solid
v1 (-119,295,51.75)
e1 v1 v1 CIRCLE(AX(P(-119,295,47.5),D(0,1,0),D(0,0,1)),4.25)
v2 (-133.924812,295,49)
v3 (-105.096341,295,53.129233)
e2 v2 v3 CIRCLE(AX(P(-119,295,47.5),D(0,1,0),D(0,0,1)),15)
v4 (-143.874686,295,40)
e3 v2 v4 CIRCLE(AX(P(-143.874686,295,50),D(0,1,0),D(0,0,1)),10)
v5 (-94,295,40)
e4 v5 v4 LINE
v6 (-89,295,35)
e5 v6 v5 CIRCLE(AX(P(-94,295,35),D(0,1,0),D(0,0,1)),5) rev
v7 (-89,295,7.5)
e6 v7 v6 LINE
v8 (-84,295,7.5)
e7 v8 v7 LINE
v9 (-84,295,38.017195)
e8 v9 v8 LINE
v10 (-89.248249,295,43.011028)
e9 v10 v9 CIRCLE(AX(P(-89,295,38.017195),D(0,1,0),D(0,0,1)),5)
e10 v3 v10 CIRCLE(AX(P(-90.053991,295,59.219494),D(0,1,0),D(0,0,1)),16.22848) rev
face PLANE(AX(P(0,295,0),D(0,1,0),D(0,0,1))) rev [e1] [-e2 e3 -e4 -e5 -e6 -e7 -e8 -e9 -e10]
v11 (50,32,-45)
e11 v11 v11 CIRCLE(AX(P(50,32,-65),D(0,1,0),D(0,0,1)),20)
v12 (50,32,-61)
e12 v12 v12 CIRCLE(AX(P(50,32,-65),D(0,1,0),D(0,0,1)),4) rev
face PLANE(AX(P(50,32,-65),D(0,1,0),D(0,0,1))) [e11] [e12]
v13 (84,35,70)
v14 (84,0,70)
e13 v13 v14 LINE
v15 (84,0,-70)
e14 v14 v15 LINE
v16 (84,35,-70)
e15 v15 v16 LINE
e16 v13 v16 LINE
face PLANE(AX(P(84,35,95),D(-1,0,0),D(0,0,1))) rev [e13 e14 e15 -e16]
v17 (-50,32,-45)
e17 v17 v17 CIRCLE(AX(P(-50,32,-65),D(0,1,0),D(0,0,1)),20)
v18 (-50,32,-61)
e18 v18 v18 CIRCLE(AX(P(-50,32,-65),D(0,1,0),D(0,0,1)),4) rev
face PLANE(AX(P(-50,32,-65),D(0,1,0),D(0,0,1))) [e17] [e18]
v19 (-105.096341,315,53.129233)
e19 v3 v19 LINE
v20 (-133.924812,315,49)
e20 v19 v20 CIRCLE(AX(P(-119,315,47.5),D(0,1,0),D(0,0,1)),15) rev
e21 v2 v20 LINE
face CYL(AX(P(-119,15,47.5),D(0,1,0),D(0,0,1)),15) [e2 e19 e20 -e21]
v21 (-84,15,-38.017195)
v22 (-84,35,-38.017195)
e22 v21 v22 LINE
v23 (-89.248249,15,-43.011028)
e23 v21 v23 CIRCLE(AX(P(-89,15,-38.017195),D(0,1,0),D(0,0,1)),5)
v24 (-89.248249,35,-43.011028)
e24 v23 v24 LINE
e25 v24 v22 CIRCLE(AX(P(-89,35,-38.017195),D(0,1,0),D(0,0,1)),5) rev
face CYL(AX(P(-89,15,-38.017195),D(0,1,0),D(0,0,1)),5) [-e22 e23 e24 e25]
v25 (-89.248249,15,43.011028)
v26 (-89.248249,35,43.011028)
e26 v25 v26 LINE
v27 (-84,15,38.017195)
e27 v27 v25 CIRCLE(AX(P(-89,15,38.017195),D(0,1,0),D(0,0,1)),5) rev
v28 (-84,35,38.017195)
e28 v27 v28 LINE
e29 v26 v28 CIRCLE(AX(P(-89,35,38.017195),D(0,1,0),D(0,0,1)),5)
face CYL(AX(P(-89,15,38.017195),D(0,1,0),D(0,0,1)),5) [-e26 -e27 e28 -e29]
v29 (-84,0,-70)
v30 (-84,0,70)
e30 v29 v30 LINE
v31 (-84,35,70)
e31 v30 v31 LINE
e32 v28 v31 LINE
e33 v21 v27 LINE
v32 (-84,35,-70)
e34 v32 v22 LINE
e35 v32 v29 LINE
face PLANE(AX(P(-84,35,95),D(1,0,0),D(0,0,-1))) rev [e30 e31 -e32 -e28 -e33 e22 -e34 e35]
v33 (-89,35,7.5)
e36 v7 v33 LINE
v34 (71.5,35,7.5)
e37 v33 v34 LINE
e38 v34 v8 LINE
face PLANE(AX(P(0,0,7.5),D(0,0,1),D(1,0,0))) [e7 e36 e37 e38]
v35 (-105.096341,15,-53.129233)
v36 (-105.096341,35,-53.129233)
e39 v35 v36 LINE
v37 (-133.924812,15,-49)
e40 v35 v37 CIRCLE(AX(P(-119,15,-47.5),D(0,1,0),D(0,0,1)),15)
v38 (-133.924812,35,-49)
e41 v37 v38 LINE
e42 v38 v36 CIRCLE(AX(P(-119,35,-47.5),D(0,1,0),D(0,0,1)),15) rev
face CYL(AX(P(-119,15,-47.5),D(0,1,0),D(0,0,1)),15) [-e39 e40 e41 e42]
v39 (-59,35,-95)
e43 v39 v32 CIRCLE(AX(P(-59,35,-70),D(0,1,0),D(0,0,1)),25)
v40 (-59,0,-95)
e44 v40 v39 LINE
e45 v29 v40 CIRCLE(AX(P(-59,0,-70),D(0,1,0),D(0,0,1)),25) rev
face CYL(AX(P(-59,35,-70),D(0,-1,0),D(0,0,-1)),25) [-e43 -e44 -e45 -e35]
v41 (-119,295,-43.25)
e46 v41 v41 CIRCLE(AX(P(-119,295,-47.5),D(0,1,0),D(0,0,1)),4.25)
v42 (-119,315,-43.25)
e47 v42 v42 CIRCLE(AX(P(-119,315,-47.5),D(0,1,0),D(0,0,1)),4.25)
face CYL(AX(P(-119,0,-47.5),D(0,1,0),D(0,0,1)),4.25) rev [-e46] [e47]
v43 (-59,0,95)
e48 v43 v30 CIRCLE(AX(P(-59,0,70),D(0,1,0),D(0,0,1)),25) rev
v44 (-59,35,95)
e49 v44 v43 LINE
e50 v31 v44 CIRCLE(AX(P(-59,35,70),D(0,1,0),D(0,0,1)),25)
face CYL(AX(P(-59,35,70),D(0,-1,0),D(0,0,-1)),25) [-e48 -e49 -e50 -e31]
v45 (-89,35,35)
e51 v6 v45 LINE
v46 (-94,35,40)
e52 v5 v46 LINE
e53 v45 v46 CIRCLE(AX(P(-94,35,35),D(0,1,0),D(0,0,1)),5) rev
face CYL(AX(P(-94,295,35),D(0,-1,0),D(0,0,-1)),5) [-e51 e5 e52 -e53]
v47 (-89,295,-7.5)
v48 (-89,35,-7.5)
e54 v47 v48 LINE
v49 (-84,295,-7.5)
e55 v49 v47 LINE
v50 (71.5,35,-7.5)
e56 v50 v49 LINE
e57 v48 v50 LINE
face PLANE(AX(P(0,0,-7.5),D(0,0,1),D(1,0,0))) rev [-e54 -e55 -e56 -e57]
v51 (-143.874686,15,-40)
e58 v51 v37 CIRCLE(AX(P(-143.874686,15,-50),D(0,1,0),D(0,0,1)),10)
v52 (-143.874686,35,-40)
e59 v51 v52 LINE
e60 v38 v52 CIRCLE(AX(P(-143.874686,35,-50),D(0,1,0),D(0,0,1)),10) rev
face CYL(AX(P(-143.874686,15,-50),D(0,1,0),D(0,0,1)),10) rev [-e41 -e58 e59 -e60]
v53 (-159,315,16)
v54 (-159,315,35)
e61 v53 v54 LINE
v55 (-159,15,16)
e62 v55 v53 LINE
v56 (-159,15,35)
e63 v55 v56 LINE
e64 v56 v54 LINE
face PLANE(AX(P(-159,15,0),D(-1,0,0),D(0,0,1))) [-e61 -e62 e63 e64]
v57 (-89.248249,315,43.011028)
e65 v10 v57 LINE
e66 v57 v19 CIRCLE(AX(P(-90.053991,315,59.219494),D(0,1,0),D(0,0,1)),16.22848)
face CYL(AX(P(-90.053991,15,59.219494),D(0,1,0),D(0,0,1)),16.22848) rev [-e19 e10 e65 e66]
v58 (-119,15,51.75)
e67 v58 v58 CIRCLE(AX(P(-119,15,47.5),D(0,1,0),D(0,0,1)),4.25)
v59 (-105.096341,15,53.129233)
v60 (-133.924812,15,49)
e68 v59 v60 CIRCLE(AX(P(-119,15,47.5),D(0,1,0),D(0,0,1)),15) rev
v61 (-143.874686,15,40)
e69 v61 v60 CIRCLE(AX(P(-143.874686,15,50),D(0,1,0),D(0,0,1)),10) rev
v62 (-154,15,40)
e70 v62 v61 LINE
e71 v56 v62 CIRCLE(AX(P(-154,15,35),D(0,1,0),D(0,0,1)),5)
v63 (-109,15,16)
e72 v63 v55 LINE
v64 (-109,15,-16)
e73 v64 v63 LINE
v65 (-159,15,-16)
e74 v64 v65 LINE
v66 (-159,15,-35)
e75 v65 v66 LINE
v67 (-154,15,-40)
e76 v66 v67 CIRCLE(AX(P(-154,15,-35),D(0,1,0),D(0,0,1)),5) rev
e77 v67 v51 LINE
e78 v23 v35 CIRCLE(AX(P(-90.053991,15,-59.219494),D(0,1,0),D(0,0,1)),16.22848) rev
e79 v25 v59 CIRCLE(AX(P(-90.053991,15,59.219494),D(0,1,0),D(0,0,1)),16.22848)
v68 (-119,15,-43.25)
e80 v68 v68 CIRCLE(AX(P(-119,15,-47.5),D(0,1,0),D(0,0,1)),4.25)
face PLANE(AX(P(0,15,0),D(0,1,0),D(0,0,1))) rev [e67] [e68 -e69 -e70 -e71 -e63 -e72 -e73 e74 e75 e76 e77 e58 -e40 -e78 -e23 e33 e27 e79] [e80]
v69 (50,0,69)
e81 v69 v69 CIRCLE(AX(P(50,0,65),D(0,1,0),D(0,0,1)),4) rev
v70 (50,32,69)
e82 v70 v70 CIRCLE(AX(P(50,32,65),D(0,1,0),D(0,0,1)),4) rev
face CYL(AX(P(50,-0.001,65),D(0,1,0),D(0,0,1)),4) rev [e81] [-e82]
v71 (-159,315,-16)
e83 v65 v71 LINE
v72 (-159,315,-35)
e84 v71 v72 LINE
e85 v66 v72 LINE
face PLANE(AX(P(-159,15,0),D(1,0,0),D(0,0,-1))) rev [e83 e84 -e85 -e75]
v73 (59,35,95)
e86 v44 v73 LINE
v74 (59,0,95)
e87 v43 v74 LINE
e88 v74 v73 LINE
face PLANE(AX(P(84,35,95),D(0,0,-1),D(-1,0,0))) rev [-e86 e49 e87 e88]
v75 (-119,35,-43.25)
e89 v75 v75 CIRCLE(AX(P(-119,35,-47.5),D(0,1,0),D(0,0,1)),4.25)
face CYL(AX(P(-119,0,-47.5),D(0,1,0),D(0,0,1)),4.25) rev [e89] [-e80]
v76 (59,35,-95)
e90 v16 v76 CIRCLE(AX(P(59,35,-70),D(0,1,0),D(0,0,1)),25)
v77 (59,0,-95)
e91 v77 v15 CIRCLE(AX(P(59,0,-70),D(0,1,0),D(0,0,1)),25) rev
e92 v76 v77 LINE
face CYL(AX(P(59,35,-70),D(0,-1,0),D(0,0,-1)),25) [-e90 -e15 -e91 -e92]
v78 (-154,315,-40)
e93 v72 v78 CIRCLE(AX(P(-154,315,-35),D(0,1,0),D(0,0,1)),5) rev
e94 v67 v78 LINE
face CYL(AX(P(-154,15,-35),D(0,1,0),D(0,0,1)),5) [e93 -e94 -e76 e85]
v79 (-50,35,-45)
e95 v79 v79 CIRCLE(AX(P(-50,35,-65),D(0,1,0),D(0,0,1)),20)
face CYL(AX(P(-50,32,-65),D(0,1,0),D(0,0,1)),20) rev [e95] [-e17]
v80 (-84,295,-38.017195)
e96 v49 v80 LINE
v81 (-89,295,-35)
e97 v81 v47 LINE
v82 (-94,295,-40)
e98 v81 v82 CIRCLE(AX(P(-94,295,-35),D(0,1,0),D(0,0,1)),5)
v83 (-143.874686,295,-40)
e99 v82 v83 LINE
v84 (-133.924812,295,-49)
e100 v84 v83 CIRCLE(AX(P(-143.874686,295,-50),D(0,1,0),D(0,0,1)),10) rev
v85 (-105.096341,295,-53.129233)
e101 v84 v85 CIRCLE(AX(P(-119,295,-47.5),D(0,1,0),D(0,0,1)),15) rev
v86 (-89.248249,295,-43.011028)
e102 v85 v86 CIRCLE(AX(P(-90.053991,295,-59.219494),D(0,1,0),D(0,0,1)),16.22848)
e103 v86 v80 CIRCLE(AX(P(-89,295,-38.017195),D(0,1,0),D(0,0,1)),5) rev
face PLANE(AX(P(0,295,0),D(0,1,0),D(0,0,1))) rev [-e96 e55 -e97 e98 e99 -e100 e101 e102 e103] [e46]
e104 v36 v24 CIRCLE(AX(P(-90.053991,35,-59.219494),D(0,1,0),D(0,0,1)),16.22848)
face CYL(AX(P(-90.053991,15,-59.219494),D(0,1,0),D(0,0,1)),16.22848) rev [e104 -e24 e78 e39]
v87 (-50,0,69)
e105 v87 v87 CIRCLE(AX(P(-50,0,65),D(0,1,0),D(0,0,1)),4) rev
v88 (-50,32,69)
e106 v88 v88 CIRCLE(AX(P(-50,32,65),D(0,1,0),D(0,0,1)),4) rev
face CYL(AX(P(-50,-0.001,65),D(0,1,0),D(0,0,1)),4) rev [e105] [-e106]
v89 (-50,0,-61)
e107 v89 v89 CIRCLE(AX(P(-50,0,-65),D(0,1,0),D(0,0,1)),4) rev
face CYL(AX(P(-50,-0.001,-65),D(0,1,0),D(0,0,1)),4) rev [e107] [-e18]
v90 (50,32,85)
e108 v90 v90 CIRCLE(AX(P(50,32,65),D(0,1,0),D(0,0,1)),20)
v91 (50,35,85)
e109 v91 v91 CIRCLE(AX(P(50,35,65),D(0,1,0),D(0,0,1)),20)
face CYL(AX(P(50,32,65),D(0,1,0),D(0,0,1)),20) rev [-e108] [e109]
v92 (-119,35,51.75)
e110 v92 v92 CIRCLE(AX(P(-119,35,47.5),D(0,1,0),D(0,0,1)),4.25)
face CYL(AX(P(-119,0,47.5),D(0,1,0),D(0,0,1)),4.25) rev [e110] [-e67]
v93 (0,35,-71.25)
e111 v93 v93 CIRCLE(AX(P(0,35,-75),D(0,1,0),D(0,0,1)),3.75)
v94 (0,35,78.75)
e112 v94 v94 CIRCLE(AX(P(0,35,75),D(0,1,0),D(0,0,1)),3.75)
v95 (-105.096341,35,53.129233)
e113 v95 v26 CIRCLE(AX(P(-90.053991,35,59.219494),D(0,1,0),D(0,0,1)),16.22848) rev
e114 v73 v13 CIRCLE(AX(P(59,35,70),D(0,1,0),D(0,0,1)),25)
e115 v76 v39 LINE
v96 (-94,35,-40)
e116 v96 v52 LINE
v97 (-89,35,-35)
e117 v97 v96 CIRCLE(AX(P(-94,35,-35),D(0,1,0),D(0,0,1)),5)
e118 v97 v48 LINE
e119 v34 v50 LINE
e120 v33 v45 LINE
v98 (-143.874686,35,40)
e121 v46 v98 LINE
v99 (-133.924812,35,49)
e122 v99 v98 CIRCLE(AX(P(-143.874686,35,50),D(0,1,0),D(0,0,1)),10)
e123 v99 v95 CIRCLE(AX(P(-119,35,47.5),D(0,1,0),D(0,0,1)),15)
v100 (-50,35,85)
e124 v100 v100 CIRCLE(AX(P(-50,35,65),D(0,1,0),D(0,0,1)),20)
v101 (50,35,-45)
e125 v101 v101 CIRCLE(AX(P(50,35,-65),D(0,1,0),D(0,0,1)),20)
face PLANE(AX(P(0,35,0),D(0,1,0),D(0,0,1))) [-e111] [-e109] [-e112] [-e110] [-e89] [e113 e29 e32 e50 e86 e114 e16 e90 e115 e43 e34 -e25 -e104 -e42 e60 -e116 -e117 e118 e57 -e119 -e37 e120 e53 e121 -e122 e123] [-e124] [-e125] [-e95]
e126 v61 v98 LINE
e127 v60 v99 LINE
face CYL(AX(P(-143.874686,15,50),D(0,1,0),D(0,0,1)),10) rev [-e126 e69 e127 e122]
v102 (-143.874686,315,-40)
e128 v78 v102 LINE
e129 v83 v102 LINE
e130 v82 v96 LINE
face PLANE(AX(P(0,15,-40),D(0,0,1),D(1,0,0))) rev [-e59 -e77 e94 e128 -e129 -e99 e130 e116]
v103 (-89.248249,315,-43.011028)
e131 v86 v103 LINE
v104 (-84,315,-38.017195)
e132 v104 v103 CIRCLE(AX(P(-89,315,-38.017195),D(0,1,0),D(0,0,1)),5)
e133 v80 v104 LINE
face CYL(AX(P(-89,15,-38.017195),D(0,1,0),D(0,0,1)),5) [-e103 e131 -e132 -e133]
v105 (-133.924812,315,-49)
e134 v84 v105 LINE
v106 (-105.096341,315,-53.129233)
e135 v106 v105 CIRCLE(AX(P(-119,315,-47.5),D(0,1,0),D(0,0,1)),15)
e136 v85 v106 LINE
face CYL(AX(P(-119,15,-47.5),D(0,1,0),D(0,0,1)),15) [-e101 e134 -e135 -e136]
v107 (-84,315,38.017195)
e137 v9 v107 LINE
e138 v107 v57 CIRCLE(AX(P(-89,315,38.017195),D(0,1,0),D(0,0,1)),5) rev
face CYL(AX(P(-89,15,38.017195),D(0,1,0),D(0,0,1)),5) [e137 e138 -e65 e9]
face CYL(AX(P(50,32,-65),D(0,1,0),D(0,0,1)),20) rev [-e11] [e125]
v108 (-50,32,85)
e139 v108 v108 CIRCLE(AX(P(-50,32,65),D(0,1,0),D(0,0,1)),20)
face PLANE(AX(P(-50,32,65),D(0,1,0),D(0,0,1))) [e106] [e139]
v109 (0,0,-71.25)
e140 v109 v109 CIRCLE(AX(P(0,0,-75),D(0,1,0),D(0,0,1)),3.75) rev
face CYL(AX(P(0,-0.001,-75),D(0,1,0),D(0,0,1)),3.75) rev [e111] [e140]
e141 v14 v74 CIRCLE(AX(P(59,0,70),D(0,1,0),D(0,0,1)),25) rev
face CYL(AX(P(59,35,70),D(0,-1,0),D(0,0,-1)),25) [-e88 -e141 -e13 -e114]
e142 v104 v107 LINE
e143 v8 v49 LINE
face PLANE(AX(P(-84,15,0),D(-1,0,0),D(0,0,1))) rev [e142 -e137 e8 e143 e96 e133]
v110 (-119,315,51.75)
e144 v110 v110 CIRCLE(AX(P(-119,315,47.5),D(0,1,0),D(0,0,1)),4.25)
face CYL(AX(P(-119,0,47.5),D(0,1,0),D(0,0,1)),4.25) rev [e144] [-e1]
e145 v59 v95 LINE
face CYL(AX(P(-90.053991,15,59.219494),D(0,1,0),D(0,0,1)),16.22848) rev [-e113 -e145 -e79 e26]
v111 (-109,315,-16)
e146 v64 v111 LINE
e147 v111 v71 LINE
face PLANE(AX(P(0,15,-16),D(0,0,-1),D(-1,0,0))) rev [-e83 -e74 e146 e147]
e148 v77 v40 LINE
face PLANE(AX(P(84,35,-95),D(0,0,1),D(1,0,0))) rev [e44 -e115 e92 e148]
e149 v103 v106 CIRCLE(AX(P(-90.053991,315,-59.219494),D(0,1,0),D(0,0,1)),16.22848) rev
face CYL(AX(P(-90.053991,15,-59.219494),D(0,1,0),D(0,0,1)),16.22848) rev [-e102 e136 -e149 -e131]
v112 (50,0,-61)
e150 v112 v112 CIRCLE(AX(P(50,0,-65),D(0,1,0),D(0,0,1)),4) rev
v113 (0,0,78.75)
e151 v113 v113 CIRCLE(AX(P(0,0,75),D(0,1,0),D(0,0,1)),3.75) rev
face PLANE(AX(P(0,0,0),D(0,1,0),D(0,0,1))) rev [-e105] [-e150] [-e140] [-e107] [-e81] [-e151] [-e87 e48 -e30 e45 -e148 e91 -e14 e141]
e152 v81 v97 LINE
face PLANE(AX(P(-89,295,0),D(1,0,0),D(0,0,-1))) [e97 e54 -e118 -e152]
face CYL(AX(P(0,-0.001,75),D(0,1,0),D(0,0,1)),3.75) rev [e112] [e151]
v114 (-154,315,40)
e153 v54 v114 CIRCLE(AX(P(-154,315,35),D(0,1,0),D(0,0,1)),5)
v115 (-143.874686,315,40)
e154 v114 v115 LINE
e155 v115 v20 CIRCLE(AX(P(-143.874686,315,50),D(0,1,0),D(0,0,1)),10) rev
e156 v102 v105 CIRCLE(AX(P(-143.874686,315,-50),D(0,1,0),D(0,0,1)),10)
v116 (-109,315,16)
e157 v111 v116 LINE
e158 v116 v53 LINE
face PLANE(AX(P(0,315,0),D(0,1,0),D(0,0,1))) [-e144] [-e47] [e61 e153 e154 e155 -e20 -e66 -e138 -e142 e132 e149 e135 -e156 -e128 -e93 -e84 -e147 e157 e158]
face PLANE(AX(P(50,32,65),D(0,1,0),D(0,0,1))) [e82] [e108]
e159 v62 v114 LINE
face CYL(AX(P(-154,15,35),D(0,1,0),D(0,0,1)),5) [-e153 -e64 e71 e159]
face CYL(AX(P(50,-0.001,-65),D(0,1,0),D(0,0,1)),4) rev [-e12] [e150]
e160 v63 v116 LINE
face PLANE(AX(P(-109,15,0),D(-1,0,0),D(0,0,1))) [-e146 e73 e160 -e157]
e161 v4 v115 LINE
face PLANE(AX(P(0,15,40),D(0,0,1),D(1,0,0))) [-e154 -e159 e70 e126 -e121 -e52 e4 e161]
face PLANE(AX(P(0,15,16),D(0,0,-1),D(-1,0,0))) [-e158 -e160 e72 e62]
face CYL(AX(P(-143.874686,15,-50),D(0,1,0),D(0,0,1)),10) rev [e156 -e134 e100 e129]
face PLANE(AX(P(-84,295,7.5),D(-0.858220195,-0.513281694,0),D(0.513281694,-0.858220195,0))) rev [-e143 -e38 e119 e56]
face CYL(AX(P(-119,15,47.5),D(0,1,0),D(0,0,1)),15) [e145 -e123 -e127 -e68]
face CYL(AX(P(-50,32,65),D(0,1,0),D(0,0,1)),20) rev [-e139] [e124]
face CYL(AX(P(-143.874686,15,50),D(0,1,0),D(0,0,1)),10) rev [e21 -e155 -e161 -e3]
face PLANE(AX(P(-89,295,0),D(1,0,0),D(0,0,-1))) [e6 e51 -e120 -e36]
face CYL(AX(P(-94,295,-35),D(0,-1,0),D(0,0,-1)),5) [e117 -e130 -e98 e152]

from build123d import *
from build123d.topology import SkipClean

# Parameters (mm, degrees)
SKETCH_2_W          = 168
SKETCH_2_H          = 190
EXTRUDE_1_DEPTH     = 35
CUT_EXTRUDE_1_REACH = 133.552
SKETCH_3_R          = 3.75
CUT_EXTRUDE_2_REACH = 133.552
SKETCH_4_R          = 4
SKETCH_5_R          = 20
CUT_EXTRUDE_3_DEPTH = 3
FILLET_1_R          = 25
EXTRUDE_2_DEPTH     = 300
CUT_EXTRUDE_START   = 260
CUT_EXTRUDE_4_DEPTH = 260
EXTRUDE_3_DEPTH     = 7.5
SKETCH_12_R         = 4.25
CUT_EXTRUDE_5_DEPTH = 366.418937659


with BuildPart() as part:
    # 草图2 → 凸台-拉伸1 (new body)
    with BuildSketch(Plane(origin=(0, 0, 0), x_dir=(1, 0, 0), z_dir=(0, 1, 0))):
        Rectangle(SKETCH_2_W, SKETCH_2_H)
    extrude(amount=EXTRUDE_1_DEPTH)

    # 草图3 → 切除-拉伸1 (cut, up to next)
    with BuildSketch(Plane(origin=(0, 35, 0), x_dir=(1, 0, 0), z_dir=(0, 1, 0)), mode=Mode.PRIVATE) as cut_extrude_1_sk1:
        with Locations((0, 75)):
            Circle(SKETCH_3_R)
    cut_extrude_1_tool1 = extrude(cut_extrude_1_sk1.sketch, amount=-CUT_EXTRUDE_1_REACH, mode=Mode.PRIVATE) & part.part
    # 草图3 → 切除-拉伸1 (cut, up to next)
    with BuildSketch(Plane(origin=(0, 35, 0), x_dir=(1, 0, 0), z_dir=(0, 1, 0)), mode=Mode.PRIVATE) as cut_extrude_1_sk2:
        with Locations((0, -75)):
            Circle(SKETCH_3_R)
    cut_extrude_1_tool2 = extrude(cut_extrude_1_sk2.sketch, amount=-CUT_EXTRUDE_1_REACH, mode=Mode.PRIVATE) & part.part
    add(cut_extrude_1_tool1.solids().sort_by_distance((0, 35, -75))[0], mode=Mode.SUBTRACT)
    add(cut_extrude_1_tool2.solids().sort_by_distance((0, 35, 75))[0], mode=Mode.SUBTRACT)

    # 草图4 → 切除-拉伸2 (cut, up to next)
    with BuildSketch(Plane(origin=(0, 35, 0), x_dir=(1, 0, 0), z_dir=(0, 1, 0)), mode=Mode.PRIVATE) as cut_extrude_2_sk1:
        with Locations((-50, 65)):
            Circle(SKETCH_4_R)
    cut_extrude_2_tool1 = extrude(cut_extrude_2_sk1.sketch, amount=-CUT_EXTRUDE_2_REACH, mode=Mode.PRIVATE) & part.part
    # 草图4 → 切除-拉伸2 (cut, up to next)
    with BuildSketch(Plane(origin=(0, 35, 0), x_dir=(1, 0, 0), z_dir=(0, 1, 0)), mode=Mode.PRIVATE) as cut_extrude_2_sk2:
        with Locations((50, 65)):
            Circle(SKETCH_4_R)
    cut_extrude_2_tool2 = extrude(cut_extrude_2_sk2.sketch, amount=-CUT_EXTRUDE_2_REACH, mode=Mode.PRIVATE) & part.part
    # 草图4 → 切除-拉伸2 (cut, up to next)
    with BuildSketch(Plane(origin=(0, 35, 0), x_dir=(1, 0, 0), z_dir=(0, 1, 0)), mode=Mode.PRIVATE) as cut_extrude_2_sk3:
        with Locations((-50, -65)):
            Circle(SKETCH_4_R)
    cut_extrude_2_tool3 = extrude(cut_extrude_2_sk3.sketch, amount=-CUT_EXTRUDE_2_REACH, mode=Mode.PRIVATE) & part.part
    # 草图4 → 切除-拉伸2 (cut, up to next)
    with BuildSketch(Plane(origin=(0, 35, 0), x_dir=(1, 0, 0), z_dir=(0, 1, 0)), mode=Mode.PRIVATE) as cut_extrude_2_sk4:
        with Locations((50, -65)):
            Circle(SKETCH_4_R)
    cut_extrude_2_tool4 = extrude(cut_extrude_2_sk4.sketch, amount=-CUT_EXTRUDE_2_REACH, mode=Mode.PRIVATE) & part.part
    add(cut_extrude_2_tool1.solids().sort_by_distance((-50, 35, -65))[0], mode=Mode.SUBTRACT)
    add(cut_extrude_2_tool2.solids().sort_by_distance((50, 35, -65))[0], mode=Mode.SUBTRACT)
    add(cut_extrude_2_tool3.solids().sort_by_distance((-50, 35, 65))[0], mode=Mode.SUBTRACT)
    add(cut_extrude_2_tool4.solids().sort_by_distance((50, 35, 65))[0], mode=Mode.SUBTRACT)

    # 草图5 → 切除-拉伸3 (cut)
    with BuildSketch(Plane(origin=(0, 35, 0), x_dir=(1, 0, 0), z_dir=(0, 1, 0))):
        with Locations((-50, 65)):
            Circle(SKETCH_5_R)
        with Locations((50, 65)):
            Circle(SKETCH_5_R)
        with Locations((50, -65)):
            Circle(SKETCH_5_R)
        with Locations((-50, -65)):
            Circle(SKETCH_5_R)
    extrude(amount=-CUT_EXTRUDE_3_DEPTH, mode=Mode.SUBTRACT)

    # 圆角1
    fillet_1_edges = [part.edges().sort_by_distance(p)[0] for p in [
        (-84, 17.5, -95),
        (84, 17.5, -95),
        (84, 17.5, 95),
        (-84, 17.5, 95),
    ]]
    fillet(fillet_1_edges, radius=FILLET_1_R)

    # 草图8 → 凸台-拉伸2 (add)
    with BuildSketch(Plane(origin=(0, 315, 0), x_dir=(1, 0, 0), z_dir=(0, 1, 0))):
        with BuildLine():
            Line((-109, 16), (-109, -16))
            Line((-109, -16), (-159, -16))
            Line((-159, -16), (-159, -35))
            ThreePointArc((-159, -35), (-157.535533906, -38.535533906), (-154, -40))
            Line((-154, -40), (-143.874685928, -40))
            ThreePointArc((-143.874685928, -40), (-137.166481995, -42.583801513), (-133.924811557, -49))
            ThreePointArc((-133.924811557, -49), (-121.126812284, -62.348456806), (-105.096341116, -53.129233486))
            ThreePointArc((-105.096341116, -53.129233486), (-98.786961451, -45.541087589), (-89.248249261, -43.01102837))
            ThreePointArc((-89.248249261, -43.01102837), (-85.553352811, -41.639435016), (-84, -38.017194942))
            Line((-84, -38.017194942), (-84, 38.017194942))
            ThreePointArc((-84, 38.017194942), (-85.553352811, 41.639435016), (-89.248249261, 43.01102837))
            ThreePointArc((-89.248249261, 43.01102837), (-98.786961451, 45.541087589), (-105.096341116, 53.129233486))
            ThreePointArc((-105.096341116, 53.129233486), (-121.126812284, 62.348456806), (-133.924811557, 49))
            ThreePointArc((-133.924811557, 49), (-137.166481995, 42.583801513), (-143.874685928, 40))
            Line((-143.874685928, 40), (-154, 40))
            ThreePointArc((-154, 40), (-157.535533906, 38.535533906), (-159, 35))
            Line((-159, 35), (-159, 16))
            Line((-159, 16), (-109, 16))
        make_face()
    extrude(amount=-EXTRUDE_2_DEPTH)

    # 草图10 → 切除-拉伸4 (cut)
    with SkipClean():  # the faces are left unmerged after this step: merging them gives an invalid solid
        with BuildSketch(Plane(origin=(0, 35, 0), x_dir=(1, 0, 0), z_dir=(0, 1, 0)).offset(CUT_EXTRUDE_START)):
            with BuildLine():
                ThreePointArc((-94, 40), (-90.464466094, 38.535533906), (-89, 35))
                Line((-89, 35), (-89, -35))
                ThreePointArc((-89, -35), (-90.464466094, -38.535533906), (-94, -40))
                Line((-94, -40), (-154, -40))
                ThreePointArc((-154, -40), (-157.535533906, -38.535533906), (-159, -35))
                Line((-159, -35), (-159, -16))
                Line((-159, -16), (-166.391829747, -16))
                Line((-166.391829747, -16), (-166.391829747, -67.593352797))
                Line((-166.391829747, -67.593352797), (-78.896973025, -67.593352797))
                Line((-78.896973025, -67.593352797), (-78.896973025, 67.593352797))
                Line((-78.896973025, 67.593352797), (-166.391829747, 67.593352797))
                Line((-166.391829747, 67.593352797), (-166.391829747, 16))
                Line((-166.391829747, 16), (-159, 16))
                Line((-159, 16), (-159, 35))
                ThreePointArc((-159, 35), (-157.535533906, 38.535533906), (-154, 40))
                Line((-154, 40), (-94, 40))
            make_face()
        extrude(amount=-CUT_EXTRUDE_4_DEPTH, mode=Mode.SUBTRACT)
    add(part.part.scale(1), mode=Mode.REPLACE)  # the faces are merged on a copy

    # 草图11 → 凸台-拉伸3 (add, symmetric)
    with BuildSketch(Plane.XY):
        Polygon((-84, 295), (71.5, 35), (-89.248249261, 35), (-89.248249261, 295), align=None)
    extrude(amount=EXTRUDE_3_DEPTH, both=True)

    # 草图12 → 切除-拉伸5 (cut, through all)
    with BuildSketch(Plane(origin=(0, 315, 0), x_dir=(1, 0, 0), z_dir=(0, 1, 0))):
        with Locations((-119, 47.5)):
            Circle(SKETCH_12_R)
        with Locations((-119, -47.5)):
            Circle(SKETCH_12_R)
    extrude(amount=-CUT_EXTRUDE_5_DEPTH, mode=Mode.SUBTRACT)


solid = part.part
